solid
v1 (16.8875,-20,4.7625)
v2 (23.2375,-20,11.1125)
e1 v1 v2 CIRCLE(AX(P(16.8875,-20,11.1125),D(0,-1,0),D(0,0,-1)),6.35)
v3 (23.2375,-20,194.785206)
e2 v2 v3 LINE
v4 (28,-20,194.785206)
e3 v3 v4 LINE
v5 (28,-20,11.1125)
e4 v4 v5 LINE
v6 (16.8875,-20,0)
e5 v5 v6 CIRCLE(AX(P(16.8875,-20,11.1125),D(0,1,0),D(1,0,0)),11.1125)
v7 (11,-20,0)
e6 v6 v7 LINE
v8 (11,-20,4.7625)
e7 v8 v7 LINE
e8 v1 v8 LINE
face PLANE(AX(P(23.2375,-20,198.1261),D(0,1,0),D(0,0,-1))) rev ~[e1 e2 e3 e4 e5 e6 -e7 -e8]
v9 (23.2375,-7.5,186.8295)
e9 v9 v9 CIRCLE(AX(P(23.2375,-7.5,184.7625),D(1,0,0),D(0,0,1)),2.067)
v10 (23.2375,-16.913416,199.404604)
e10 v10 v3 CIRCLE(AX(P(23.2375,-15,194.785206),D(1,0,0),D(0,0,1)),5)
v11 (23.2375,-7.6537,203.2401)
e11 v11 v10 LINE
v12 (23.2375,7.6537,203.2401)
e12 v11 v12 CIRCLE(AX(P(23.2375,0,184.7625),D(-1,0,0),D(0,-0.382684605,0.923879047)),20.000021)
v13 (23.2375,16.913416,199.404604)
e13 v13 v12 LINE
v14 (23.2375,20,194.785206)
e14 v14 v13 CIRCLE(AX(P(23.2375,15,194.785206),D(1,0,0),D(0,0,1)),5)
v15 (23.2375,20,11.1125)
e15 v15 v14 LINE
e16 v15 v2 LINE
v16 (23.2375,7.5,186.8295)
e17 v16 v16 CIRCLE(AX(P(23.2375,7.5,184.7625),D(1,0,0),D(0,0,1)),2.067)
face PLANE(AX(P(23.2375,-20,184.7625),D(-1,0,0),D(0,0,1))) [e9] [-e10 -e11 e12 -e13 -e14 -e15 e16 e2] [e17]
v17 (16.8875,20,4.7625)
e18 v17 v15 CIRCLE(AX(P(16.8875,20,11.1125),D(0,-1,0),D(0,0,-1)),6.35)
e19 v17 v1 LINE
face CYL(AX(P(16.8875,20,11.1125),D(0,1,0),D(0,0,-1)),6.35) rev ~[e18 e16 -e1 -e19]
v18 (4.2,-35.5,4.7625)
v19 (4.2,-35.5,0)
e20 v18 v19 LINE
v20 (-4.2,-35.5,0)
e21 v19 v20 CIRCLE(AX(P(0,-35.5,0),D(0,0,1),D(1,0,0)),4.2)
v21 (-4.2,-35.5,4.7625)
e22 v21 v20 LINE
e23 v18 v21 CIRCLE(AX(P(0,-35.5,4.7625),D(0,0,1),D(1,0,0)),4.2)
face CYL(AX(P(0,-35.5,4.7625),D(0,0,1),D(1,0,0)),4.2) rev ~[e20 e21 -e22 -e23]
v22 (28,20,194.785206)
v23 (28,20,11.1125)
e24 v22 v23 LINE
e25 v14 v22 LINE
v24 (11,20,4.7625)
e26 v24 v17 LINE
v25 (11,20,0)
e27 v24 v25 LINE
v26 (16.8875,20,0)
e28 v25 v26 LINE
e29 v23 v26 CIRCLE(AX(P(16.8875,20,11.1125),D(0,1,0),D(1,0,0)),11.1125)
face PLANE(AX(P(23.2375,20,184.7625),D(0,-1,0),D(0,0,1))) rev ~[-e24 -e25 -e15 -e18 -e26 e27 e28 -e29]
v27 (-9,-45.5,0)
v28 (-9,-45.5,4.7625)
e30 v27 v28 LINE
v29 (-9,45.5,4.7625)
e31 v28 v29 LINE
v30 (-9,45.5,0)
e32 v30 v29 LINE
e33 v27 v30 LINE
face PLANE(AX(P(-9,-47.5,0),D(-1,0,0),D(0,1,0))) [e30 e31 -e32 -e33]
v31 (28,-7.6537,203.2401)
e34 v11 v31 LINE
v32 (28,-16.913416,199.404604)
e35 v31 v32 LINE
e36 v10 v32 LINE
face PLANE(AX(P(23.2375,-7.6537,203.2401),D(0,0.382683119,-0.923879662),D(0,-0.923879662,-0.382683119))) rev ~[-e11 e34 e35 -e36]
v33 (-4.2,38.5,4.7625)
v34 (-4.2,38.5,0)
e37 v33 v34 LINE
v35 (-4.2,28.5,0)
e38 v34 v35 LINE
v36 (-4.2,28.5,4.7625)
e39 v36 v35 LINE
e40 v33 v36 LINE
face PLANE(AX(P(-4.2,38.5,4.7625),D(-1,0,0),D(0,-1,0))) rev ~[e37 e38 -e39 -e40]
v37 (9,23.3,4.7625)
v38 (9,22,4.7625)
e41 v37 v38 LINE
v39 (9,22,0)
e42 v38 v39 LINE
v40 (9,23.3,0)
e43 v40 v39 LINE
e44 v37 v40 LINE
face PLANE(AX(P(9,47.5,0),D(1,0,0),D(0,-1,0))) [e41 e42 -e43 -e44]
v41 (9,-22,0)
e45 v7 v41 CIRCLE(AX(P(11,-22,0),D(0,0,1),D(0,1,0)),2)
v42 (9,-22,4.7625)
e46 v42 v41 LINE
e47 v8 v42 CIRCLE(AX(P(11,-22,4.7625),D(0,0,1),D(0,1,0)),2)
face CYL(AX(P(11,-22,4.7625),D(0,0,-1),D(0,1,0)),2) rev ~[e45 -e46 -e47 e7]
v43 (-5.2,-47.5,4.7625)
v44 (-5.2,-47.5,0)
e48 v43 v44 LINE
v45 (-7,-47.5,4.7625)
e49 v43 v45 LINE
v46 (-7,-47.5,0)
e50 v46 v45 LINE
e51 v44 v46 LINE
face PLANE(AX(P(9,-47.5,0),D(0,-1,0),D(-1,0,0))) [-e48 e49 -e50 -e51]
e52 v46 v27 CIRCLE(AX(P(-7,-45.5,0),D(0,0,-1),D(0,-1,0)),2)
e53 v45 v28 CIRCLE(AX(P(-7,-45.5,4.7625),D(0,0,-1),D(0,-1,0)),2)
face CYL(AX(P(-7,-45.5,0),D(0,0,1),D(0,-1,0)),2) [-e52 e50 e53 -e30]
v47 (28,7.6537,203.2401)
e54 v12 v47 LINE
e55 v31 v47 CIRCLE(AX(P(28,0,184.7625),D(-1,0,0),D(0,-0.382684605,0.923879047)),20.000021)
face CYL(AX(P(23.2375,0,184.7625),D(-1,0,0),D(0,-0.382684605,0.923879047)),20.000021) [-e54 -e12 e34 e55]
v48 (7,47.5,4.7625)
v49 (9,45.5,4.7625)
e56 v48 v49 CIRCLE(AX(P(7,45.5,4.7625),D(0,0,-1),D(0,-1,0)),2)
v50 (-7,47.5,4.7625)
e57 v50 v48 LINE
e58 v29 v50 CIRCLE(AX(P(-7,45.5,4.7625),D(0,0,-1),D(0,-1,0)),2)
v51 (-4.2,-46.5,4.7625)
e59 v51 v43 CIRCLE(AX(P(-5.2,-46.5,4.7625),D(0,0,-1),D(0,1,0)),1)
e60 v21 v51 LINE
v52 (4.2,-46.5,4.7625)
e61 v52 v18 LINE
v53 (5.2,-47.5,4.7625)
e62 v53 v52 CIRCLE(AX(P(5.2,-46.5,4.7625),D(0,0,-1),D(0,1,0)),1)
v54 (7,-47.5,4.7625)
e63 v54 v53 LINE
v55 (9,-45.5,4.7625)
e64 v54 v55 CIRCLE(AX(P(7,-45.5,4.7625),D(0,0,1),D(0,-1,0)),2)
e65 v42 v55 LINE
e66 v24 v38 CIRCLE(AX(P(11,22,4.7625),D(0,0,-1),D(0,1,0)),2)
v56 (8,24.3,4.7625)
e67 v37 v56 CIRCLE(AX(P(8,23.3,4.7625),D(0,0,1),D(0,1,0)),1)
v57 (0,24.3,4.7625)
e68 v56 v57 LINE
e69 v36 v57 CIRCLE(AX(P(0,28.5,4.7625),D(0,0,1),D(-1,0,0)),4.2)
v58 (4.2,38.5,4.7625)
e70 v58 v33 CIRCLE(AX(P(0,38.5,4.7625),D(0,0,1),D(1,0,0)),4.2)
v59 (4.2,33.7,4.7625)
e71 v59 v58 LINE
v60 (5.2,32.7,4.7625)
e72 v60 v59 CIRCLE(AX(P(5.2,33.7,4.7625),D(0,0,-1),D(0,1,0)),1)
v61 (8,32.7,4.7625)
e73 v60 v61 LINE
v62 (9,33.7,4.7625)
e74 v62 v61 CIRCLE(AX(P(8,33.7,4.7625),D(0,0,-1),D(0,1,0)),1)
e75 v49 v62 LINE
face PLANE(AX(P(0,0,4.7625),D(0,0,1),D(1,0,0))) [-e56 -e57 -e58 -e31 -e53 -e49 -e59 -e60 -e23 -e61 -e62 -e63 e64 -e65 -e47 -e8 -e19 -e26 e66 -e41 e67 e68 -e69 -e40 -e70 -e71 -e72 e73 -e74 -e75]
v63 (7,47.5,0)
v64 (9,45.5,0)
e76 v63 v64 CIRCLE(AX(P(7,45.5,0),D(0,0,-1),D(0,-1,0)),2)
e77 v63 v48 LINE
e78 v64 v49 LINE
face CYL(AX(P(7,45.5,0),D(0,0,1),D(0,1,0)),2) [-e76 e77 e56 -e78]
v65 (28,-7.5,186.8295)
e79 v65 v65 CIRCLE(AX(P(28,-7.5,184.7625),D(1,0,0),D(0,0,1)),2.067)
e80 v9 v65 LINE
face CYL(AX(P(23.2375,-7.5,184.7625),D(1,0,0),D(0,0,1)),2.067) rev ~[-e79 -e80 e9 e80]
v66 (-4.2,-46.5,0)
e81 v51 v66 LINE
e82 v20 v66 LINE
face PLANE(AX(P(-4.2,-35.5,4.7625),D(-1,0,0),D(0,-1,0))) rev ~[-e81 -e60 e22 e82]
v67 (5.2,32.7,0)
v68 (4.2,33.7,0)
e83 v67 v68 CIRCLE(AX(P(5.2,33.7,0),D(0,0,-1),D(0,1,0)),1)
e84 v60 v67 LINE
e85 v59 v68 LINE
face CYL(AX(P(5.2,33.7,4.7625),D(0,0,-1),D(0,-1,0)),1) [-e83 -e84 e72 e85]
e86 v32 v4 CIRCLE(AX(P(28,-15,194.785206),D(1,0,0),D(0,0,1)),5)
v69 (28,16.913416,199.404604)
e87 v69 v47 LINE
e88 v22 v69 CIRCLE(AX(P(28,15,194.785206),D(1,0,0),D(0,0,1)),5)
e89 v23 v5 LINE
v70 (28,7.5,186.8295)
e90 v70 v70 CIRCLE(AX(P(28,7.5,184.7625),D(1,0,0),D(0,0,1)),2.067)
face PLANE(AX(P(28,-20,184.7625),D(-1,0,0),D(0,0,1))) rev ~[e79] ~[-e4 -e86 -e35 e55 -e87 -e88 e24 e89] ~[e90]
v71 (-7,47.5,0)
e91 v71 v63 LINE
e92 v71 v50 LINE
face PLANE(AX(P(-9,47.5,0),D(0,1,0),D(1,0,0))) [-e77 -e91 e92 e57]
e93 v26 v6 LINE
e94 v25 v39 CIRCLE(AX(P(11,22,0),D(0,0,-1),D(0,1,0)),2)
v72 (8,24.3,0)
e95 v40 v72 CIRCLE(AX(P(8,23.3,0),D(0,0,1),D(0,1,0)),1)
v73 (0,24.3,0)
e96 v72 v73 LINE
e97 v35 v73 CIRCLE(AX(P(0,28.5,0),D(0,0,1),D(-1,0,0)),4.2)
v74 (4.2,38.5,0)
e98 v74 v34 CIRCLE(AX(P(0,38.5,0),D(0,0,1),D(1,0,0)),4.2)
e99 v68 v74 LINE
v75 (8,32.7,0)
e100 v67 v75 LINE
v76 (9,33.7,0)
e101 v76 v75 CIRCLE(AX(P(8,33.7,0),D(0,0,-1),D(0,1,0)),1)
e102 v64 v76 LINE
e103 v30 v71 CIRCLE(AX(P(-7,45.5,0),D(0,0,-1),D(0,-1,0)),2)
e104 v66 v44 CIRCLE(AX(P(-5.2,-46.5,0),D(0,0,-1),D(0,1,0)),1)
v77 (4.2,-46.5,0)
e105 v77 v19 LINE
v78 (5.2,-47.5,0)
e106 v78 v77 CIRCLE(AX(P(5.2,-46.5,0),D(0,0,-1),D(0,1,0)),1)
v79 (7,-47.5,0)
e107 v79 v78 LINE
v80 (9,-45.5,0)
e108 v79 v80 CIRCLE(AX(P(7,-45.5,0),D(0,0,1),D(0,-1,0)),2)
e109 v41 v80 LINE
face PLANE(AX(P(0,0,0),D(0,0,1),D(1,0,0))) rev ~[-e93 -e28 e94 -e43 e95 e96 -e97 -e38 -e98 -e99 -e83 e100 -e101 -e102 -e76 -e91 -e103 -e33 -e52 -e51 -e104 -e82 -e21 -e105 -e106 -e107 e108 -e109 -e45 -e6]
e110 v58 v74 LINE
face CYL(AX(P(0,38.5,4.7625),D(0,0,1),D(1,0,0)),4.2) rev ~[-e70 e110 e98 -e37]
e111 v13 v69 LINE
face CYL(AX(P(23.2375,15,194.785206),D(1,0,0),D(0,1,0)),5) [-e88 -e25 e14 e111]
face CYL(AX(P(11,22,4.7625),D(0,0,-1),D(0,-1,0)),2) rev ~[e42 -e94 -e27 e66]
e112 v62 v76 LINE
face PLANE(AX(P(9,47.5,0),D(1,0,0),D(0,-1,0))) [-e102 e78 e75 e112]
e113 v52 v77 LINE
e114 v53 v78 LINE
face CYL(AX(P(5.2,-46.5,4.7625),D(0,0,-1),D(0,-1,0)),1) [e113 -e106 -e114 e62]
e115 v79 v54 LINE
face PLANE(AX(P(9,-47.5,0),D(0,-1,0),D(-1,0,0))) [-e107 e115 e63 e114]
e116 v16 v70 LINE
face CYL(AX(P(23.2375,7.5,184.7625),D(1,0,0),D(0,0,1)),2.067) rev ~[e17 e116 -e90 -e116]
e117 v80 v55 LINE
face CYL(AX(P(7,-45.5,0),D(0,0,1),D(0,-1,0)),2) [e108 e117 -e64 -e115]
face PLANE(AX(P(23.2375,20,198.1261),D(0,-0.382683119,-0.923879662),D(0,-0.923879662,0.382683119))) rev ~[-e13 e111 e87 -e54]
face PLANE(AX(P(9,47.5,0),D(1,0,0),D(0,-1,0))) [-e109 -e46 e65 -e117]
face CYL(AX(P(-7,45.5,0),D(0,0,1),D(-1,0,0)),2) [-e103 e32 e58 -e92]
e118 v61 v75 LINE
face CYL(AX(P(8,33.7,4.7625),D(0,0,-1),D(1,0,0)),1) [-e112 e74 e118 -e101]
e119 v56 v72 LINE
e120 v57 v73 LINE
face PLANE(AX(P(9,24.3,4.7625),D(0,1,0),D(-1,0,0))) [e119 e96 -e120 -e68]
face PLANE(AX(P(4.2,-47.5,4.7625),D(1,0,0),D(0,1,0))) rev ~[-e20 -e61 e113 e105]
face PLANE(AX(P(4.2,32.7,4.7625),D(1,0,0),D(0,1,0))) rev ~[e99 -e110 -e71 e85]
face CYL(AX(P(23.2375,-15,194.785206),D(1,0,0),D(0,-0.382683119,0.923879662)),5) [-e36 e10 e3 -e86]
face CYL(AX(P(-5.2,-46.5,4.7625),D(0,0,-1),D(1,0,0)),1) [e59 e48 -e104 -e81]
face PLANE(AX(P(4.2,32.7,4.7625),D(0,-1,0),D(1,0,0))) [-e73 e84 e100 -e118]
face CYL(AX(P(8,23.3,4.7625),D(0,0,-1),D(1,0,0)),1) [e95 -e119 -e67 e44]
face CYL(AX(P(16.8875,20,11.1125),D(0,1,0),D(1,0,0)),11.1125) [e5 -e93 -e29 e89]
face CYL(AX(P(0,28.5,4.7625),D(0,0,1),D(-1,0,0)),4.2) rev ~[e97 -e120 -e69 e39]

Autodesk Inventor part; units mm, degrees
ref_plane "YZ Plane" through (0, 0, 0) normal (1, 0, 0) x (0, 1, 0)
ref_plane "XZ Plane" through (0, 0, 0) normal (0, 1, 0) x (-1, 0, 0)
ref_plane "XY Plane" through (0, 0, 0) normal (0, 0, 1) x (1, 0, 0)
sketch "Sketch3" plane through (0, 0, 0) normal (0, 0, 1) x (1, 0, 0)
  line L0 (9, -47.5) -> (-9, -47.5)
  line L1 (-9, -47.5) -> (-9, 47.5)
  line L2 (-9, 47.5) -> (9, 47.5)
  line L3 (9, 47.5) -> (9, -47.5)
  line L4 (9, -47.5) -> (-9, 47.5) construction
  line L5 (-9, -47.5) -> (9, 47.5) construction
  line L6 (9, 47.5) -> (14, 47.5)
  line L7 (14, 47.5) -> (14, -47.5)
  line L8 (14, -47.5) -> (9, -47.5)
  line L9 (9, -47.5) -> (9, 47.5)
  point P0 (0, 0)
  dimension "d10" = 18
  dimension "d11" = 95
  dimension "d25" = 5
extrude "Plate2" add sketch "Sketch3" along normal blind 4.7625 contours L0 L1 L2 L3
sketch "Sketch4" plane through (0, 0, 4.7625) normal (0, 0, 1) x (1, 0, 0)
  line L0 (-9, -47.5) -> (-9, 47.5) construction
  line L1 (0, 28.5) -> (0, 38.5) construction
  line L2 (4.2, 28.5) -> (4.2, 38.5)
  line L3 (-4.2, 38.5) -> (-4.2, 28.5)
  arc A0 (-4.2, 28.5) -> (4.2, 28.5) centre (0, 28.5) ccw
  arc A1 (4.2, 38.5) -> (-4.2, 38.5) centre (0, 38.5) ccw
  line L4 (0, -35.5) -> (0, -47.5) construction
  line L5 (-9, -47.5) -> (9, -47.5) projected
  line L6 (-4.2, -35.5) -> (-4.2, -47.5)
  line L7 (4.2, -47.5) -> (4.2, -35.5)
  arc A2 (4.2, -35.5) -> (-4.2, -35.5) centre (0, -35.5) ccw
  arc A3 (-4.2, -47.5) -> (4.2, -47.5) centre (0, -47.5) ccw
  line L8 (0, -41) -> (0, -35.5) construction
  line L9 (0, 28.5) -> (9, 28.5) construction
  line L10 (0, 32.7) -> (9, 32.7)
  line L11 (9, 24.3) -> (0, 24.3)
  arc A4 (0, 32.7) -> (0, 24.3) centre (0, 28.5) ccw
  arc A5 (9, 24.3) -> (9, 32.7) centre (9, 28.5) ccw
  line L12 (9, 47.5) -> (9, -47.5) projected
  line L13 (-9, 47.5) -> (9, 47.5) projected
  point P0 (0, 0)
  point P1 (0, 33.5)
  point P2 (0, -41.5)
  point P3 (4.5, 28.5)
  point P4 (0, 42.7)
  point P5 (4.2, 32.7)
  point P6 (0, 24.3)
  dimension "d15" = 10
  dimension "d61" = 4.2
  dimension "d62" = 12
  dimension "d63" = 4.8
  dimension "d64" = 4.8
extrude "Extrusion2" cut sketch "Sketch4" against normal through all contours A0 A4 L10 L2 | L2 L10 L12 L11 A0 | L10 A4 L3 A1 L2 | L6 A2 L7 L5
fillet "Fillet3" radius 1 5 edges at (-4.2, -47.5, 2.3813) (4.2, -47.5, 2.3813) (9, 32.7, 2.3813) (9, 24.3, 2.3813) (4.2, 32.7, 2.3813)
fillet "Fillet4" radius 2 4 edges at (-9, 47.5, 2.3813) (-9, -47.5, 2.3813) (9, 47.5, 2.3813) (9, -47.5, 2.3813)
sketch "Sketch5" plane through (0, 0, 4.7625) normal (0, 0, 1) x (1, 0, 0)
  line L0 (16.8875, -20) -> (9, -20)
  line L1 (9, -20) -> (9, 20)
  line L2 (9, 20) -> (16.8875, 20)
  line L3 (16.8875, 20) -> (16.8875, -20)
  line L4 (16.8875, -20) -> (9, 20) construction
  line L5 (9, -20) -> (16.8875, 20) construction
  line L6 (28, 20.7219) -> (28, -16.4847) construction
  line L7 (9, 24.3) -> (9, -47.5) projected
  point P0 (0, 0)
  point P1 (12.9438, 0)
  point P2 (14, -29.8149)
  dimension "d20" = 40
  dimension "d21" = 28
  dimension "d22" = 11.1125
extrude "Extrusion3" add sketch "Sketch5" against normal up to surface (4.7625 mm away)
sketch "Sketch6" plane through (23.2375, 20, 11.1125) normal (1, 0, 0) x (0, 1, 0)
  line L0 (-40, 0) -> (0, 0)
  line L1 (0, 0) -> (0, 173.65)
  line L2 (0, 173.65) -> (-40, 173.65)
  line L3 (-40, 173.65) -> (-40, 0)
edge flange "Flange1" height 180 angle 90 thickness 4.7625 bend radius 6.35 thickness toward (1, 0, 0) relief tear relief width 4.7625 relief depth 2.3813 edges at (16.8875, 0, 4.7625) wall of the first edge with corners at (23.2375, -20, 11.1125) (23.2375, 20, 11.1125) (23.2375, 20, 184.7625) (23.2375, -20, 184.7625)
bend "Bend1"
corner "Corner1"
sketch "Sketch7" plane through (23.2375, -20, 184.7625) normal (-1, 0, 0) x (0, 0, 1)
  line L0 (-173.65, 40) -> (-173.65, 0) construction
  line L1 (0, 0) -> (-173.65, 0) construction
  line L2 (0, 0) -> (0, 40) projected
  line L3 (0, 40) -> (-173.65, 40) construction
  line L4 (0, 40) -> (13.3636, 40)
  line L5 (13.3636, 40) -> (18.4776, 27.6537)
  line L6 (18.4776, 12.3463) -> (13.3636, 0)
  line L7 (13.3636, 0) -> (0, 0)
  line L8 (0, 0) -> (0, 40) construction
  circle A0 centre (0, 20) radius 17 construction
  arc A1 (18.4776, 12.3463) -> (18.4776, 27.6537) centre (0, 20) ccw
  line L9 (0, 27.5) -> (0, 12.5) construction
  line L10 (0, 0) -> (0, 40) construction
  circle A2 centre (0, 27.5) radius 5 construction
  circle A3 centre (0, 12.5) radius 5 construction
  circle A4 centre (0, 20) radius 15 construction
  point P0 (-184.7625, 20)
  point P1 (21.6478, 20)
  dimension "d36" = 135
  dimension "d44" = 3
  dimension "d45" = 3
  dimension "d49" = 15
  dimension "d50" = 10
  dimension "d51" = 10
  dimension "d59" = 30
extrude "Extrusion4" add sketch "Sketch7" against normal up to surface (4.7625 mm away)
fillet "Fillet7" radius 5 2 edges at (25.6188, 20, 198.1261) (25.6188, -20, 198.1261)
fillet "Fillet8" radius 2 2 edges at (9, 20, 2.3813) (9, -20, 2.3813)
hole "Hole1" at (23.2375, 7.5, 184.7625) at (23.2375, -7.5, 184.7625) direction (1, 0, 0) diameter 4.134 end through all thread size "M5x0.8" class "6H" standard "ANSI Metric M Profile"
equation "\"d64\" = d63"
equation "\"d45\" = d44"
equation "\"d57\" = Thickness"
equation "\"d7\" = Thickness"
equation "\"d26\" = BendReliefWidth"
equation "\"d27\" = BendReliefDepth"
equation "\"d28\" = MinimumRemnant"
equation "\"d29\" = TransitionRadius"
equation "\"d32\" = BendRadius"
equation "\"d33\" = CornerReliefSize"
equation "\"d34\" = GapSize"
equation "\"d35\" = JacobiRadiusSize"
equation "\"BendReliefWidth\" = Thickness"
equation "\"BendReliefDepth\" = 0.5 * Thickness"
equation "\"CornerReliefSize\" = 4 * Thickness"
equation "\"MinimumRemnant\" = 2 * Thickness"
equation "\"TransitionRadius\" = BendRadius"
equation "\"JacobiRadiusSize\" = BendRadius"
equation "\"GapSize\" = Thickness"
equation "\"Thickness\" = 4.7625"
equation "\"BendRadius\" = 6.35"
properties part number "Spool Holder Left" material "Aluminum 6061"
